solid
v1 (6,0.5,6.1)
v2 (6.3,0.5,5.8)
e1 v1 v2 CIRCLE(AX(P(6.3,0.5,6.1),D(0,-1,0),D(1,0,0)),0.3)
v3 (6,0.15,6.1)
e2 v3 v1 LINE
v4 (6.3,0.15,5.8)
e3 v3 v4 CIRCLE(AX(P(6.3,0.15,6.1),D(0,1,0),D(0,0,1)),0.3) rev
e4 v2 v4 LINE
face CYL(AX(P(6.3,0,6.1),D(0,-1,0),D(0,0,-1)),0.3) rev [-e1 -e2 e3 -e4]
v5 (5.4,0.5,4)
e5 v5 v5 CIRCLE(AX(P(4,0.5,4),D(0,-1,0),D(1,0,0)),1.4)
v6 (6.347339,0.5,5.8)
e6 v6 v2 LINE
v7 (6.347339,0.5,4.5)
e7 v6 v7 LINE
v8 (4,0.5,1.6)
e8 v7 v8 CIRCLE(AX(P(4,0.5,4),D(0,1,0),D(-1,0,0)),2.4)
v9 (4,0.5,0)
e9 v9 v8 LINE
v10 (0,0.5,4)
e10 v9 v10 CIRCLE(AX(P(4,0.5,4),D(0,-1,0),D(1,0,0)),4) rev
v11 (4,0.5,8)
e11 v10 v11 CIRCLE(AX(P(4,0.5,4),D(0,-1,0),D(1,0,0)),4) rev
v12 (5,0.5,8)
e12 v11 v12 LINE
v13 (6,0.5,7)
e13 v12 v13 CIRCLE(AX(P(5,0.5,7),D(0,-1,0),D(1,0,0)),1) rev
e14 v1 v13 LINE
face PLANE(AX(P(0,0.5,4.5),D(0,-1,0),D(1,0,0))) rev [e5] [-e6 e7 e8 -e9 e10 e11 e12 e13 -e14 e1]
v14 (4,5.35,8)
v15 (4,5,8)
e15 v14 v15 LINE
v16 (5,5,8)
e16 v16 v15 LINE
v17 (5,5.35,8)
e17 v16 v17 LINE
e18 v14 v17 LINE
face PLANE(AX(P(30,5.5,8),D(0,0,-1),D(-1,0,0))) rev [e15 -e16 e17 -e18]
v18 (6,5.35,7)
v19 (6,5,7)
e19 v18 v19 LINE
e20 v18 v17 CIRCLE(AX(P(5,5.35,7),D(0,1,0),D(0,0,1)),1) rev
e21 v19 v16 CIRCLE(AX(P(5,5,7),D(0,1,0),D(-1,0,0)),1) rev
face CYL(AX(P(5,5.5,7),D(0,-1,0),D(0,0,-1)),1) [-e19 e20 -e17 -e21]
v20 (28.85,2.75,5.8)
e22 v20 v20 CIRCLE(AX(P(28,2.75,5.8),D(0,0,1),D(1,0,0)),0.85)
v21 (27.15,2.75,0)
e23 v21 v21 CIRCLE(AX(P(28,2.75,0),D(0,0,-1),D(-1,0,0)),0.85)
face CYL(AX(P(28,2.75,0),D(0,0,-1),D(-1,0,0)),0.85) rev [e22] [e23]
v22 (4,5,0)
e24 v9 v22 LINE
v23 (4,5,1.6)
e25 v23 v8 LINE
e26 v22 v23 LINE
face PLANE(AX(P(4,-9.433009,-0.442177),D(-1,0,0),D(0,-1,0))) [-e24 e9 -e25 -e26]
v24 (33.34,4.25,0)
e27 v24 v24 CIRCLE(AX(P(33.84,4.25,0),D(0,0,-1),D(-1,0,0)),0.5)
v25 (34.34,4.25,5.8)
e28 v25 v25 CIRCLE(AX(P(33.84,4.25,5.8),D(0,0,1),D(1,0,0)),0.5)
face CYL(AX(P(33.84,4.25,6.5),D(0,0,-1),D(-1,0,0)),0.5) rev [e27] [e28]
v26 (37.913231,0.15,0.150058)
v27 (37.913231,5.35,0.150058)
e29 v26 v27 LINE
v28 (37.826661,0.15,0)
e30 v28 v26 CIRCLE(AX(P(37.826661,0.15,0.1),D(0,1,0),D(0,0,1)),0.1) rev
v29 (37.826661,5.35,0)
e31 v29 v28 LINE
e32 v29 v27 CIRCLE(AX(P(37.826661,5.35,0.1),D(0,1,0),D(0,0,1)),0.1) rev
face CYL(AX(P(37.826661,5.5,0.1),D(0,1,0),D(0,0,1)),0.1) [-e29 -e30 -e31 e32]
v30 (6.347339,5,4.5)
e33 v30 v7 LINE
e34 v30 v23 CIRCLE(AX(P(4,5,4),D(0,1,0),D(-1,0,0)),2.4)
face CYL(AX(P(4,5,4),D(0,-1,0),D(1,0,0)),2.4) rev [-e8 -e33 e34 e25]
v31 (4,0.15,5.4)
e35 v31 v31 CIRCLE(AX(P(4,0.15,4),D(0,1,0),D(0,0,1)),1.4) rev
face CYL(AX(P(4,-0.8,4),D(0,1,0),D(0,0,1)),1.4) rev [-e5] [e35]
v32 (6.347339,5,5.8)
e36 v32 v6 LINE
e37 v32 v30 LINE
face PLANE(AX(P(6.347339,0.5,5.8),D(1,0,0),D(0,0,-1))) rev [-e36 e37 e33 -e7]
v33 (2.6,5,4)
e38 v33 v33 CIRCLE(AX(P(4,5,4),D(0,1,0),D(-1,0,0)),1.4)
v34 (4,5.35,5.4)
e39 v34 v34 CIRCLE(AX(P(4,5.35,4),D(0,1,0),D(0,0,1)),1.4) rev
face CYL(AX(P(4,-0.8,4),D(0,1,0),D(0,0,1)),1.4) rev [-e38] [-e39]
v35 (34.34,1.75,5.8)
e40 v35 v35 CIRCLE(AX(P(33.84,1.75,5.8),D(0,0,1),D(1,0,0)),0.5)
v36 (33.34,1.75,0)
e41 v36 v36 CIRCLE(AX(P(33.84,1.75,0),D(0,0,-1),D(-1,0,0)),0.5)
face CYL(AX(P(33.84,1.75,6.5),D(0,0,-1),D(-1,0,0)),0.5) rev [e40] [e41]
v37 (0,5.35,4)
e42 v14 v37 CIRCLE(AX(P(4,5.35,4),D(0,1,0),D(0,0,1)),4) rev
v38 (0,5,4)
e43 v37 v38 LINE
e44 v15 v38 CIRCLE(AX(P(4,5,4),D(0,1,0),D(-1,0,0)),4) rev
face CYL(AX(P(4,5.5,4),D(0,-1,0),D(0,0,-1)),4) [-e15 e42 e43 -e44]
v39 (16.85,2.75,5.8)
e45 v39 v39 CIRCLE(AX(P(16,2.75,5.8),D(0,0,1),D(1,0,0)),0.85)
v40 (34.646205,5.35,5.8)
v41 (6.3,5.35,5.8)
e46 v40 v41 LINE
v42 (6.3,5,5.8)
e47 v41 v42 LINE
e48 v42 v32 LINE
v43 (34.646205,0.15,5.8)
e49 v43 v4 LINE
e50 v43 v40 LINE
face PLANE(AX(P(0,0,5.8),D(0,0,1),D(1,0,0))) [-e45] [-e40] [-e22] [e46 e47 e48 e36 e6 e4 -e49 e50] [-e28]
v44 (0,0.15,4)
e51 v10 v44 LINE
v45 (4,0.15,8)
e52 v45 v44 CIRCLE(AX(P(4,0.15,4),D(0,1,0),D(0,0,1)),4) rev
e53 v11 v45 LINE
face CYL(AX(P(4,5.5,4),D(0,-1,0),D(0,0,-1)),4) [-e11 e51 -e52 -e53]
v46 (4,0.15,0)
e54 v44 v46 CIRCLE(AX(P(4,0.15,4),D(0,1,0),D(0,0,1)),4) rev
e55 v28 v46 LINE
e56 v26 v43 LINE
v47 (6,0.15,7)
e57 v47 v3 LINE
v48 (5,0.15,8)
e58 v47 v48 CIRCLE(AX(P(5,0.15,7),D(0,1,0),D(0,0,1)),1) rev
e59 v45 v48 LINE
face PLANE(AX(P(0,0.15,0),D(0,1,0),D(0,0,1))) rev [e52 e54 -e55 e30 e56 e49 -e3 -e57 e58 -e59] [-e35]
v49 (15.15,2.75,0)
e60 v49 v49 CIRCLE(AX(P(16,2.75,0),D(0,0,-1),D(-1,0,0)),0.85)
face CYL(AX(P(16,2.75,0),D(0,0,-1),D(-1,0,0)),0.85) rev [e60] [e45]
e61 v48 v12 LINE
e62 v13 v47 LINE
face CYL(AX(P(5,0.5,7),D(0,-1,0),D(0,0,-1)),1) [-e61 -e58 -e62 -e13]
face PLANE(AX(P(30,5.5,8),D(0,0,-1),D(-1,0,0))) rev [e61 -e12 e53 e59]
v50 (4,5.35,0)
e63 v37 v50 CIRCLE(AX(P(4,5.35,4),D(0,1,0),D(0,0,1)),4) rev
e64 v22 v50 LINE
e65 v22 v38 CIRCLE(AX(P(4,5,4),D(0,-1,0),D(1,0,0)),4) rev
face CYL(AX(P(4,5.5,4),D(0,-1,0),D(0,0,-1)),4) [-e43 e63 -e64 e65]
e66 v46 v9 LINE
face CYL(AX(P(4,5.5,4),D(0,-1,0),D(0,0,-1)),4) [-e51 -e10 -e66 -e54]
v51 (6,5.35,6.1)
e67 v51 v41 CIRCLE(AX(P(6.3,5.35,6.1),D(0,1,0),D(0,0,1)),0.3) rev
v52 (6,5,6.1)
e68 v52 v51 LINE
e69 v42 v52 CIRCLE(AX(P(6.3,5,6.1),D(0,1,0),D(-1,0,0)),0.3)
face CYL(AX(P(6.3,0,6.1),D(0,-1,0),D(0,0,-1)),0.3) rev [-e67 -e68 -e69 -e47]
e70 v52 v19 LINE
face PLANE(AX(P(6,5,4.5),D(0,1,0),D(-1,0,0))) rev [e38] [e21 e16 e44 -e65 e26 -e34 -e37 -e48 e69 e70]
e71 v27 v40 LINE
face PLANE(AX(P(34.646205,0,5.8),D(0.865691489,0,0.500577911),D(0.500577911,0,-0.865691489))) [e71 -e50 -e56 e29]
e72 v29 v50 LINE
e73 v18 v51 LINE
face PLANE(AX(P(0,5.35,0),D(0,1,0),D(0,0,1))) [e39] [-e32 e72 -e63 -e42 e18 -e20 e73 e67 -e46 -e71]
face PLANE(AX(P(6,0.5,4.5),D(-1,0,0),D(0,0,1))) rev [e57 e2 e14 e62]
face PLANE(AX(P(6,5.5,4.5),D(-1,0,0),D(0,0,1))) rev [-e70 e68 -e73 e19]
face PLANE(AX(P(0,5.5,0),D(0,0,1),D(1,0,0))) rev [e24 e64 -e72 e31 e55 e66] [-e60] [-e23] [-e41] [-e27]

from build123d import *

# Parameters (mm, degrees)
BOSS_EXTRUDE1_DEPTH    = 5.5
CUT_EXTRUDE1_DEPTH     = 3.5
FILLET2_R              = 4
SKETCH19_R             = 1.4
CUT_EXTRUDE3_DEPTH     = 6.3
SKETCH21_R             = 2.4
CUT_EXTRUDE4_DEPTH     = 4.5
BOSS_EXTRUDE3_DEPTH    = 1.3
FILLET5_R              = 0.3
FILLET6_R              = 1
BOSS_EXTRUDE4_DEPTH    = 5.5
SKETCH13_R             = 0.5
CUT_EXTRUDE5_DEPTH     = 6.5
FILLET7_R              = 0.1
SKETCH30_W             = 41.665308381
SKETCH30_H             = 8.97901041
CUT_EXTRUDE6_DEPTH     = 0.15
SKETCH31_W             = 41.594909832
SKETCH31_H             = 8.905627214
CUT_EXTRUDE7_DEPTH     = 0.15
M1_6_CLEARANCE_HOLE1_D = 1.7
CUT_EXTRUDE8_DEPTH     = 4.5


with BuildPart() as part:
    # Sketch1 → Boss-Extrude1 (new body)
    with BuildSketch(Plane(origin=(0, 0, 0), x_dir=(1, 0, 0), z_dir=(0, 1, 0))):
        Polygon((0, 0), (38, 0), (30, -8), (0, -8), align=None)
    extrude(amount=BOSS_EXTRUDE1_DEPTH)

    # Sketch4 → Cut-Extrude1 (cut)
    with BuildSketch(Plane.XY.offset(8)):
        Polygon((0, 0.5), (6, 0.5), (6, 0), (38, 0), (38, 5.5), (6, 5.5), (6, 5), (0, 5), align=None)
    extrude(amount=-CUT_EXTRUDE1_DEPTH, mode=Mode.SUBTRACT)

    # Fillet2
    fillet2_edges = [part.edges().sort_by_distance(p)[0] for p in [
        (0, 5.25, 8),
        (0, 2.75, 0),
    ]]
    fillet(fillet2_edges, radius=FILLET2_R - 0.0001)  # a hair under: the kernel refuses the full size

    # Sketch19 → Cut-Extrude3 (cut)
    with BuildSketch(Plane(origin=(0, 5.5, 0), x_dir=(1, 0, 0), z_dir=(0, 1, 0))):
        with Locations(Location((4, -4, 0), (0, 0, 270))):
            Circle(SKETCH19_R)
    extrude(amount=-CUT_EXTRUDE3_DEPTH, mode=Mode.SUBTRACT)

    # Sketch21 → Cut-Extrude4 (cut)
    with BuildSketch(Plane(origin=(0, 0.5, 0), x_dir=(1, 0, 0), z_dir=(0, 1, 0))):
        with Locations((4, -4)):
            Circle(SKETCH21_R)
    extrude(amount=CUT_EXTRUDE4_DEPTH, mode=Mode.SUBTRACT)

    # Sketch22 → Boss-Extrude3 (add)
    with BuildSketch(Plane.XY.offset(4.5)):
        Polygon((6.347338919, 5), (6, 5), (6, 5.5), (33.5, 5.5), (33.5, 0), (6, 0), (6, 0.5), (6.347338919, 0.5), align=None)
    extrude(amount=BOSS_EXTRUDE3_DEPTH)

    # Fillet5
    fillet5_edges = [part.edges().sort_by_distance(p)[0] for p in [
        (6, 0.25, 5.8),
        (6, 5.25, 5.8),
    ]]
    fillet(fillet5_edges, radius=FILLET5_R)

    # Fillet6
    fillet6_edges = [part.edges().sort_by_distance(p)[0] for p in [
        (6, 5.25, 8),
        (6, 0.25, 8),
    ]]
    fillet(fillet6_edges, radius=FILLET6_R)

    # Sketch25 → Boss-Extrude4 (add)
    with BuildSketch(Plane(origin=(0, 5.5, 0), x_dir=(1, 0, 0), z_dir=(0, 1, 0))):
        Polygon((38, 0), (33.5, -4.5), (33.5, -5.8), (34.646204889, -5.8), align=None)
    extrude(amount=-BOSS_EXTRUDE4_DEPTH)

    # Sketch13 → Cut-Extrude5 (cut)
    with BuildSketch(Plane(origin=(0, 0, 0), x_dir=(-1, 0, 0), z_dir=(0, 0, -1))):
        with Locations((-33.84, 4.25)):
            Circle(SKETCH13_R)
        with Locations((-33.84, 1.75)):
            Circle(SKETCH13_R)
    extrude(amount=-CUT_EXTRUDE5_DEPTH, mode=Mode.SUBTRACT)

    # Fillet7
    fillet7_edges = [part.edges().sort_by_distance(p)[0] for p in [
        (38, 2.75, 0),
    ]]
    fillet(fillet7_edges, radius=FILLET7_R)

    # Sketch30 → Cut-Extrude6 (cut)
    with BuildSketch(Plane(origin=(0, 5.5, 0), x_dir=(1, 0, 0), z_dir=(0, 1, 0))):
        with Locations((19.118021654, -4.03845395)):
            Rectangle(SKETCH30_W, SKETCH30_H)
    extrude(amount=-CUT_EXTRUDE6_DEPTH, mode=Mode.SUBTRACT)

    # Sketch31 → Cut-Extrude7 (cut)
    with BuildSketch(Plane(origin=(0, 0, 0), x_dir=(-1, 0, 0), z_dir=(0, -1, 0))):
        with Locations((-18.959670937, -4.021529517)):
            Rectangle(SKETCH31_W, SKETCH31_H)
    extrude(amount=-CUT_EXTRUDE7_DEPTH, mode=Mode.SUBTRACT)

    # M1.6 Clearance Hole1 (through all)
    with Locations(Plane(origin=(0, 0, 0), x_dir=(-1, 0, 0), z_dir=(0, 0, -1))):
        with Locations((-16, 2.75), (-28, 2.75)):
            Hole(M1_6_CLEARANCE_HOLE1_D / 2)

    # Sketch37 → Cut-Extrude8 (cut)
    with BuildSketch(Plane.XZ.offset(-5)):
        with BuildLine():
            Line((4, -0.442176814), (4, 8.442176814))
            ThreePointArc((4, 8.442176814), (-0.442176814, 4), (4, -0.442176814))
        make_face()
    extrude(amount=CUT_EXTRUDE8_DEPTH, mode=Mode.SUBTRACT)


solid = part.part
